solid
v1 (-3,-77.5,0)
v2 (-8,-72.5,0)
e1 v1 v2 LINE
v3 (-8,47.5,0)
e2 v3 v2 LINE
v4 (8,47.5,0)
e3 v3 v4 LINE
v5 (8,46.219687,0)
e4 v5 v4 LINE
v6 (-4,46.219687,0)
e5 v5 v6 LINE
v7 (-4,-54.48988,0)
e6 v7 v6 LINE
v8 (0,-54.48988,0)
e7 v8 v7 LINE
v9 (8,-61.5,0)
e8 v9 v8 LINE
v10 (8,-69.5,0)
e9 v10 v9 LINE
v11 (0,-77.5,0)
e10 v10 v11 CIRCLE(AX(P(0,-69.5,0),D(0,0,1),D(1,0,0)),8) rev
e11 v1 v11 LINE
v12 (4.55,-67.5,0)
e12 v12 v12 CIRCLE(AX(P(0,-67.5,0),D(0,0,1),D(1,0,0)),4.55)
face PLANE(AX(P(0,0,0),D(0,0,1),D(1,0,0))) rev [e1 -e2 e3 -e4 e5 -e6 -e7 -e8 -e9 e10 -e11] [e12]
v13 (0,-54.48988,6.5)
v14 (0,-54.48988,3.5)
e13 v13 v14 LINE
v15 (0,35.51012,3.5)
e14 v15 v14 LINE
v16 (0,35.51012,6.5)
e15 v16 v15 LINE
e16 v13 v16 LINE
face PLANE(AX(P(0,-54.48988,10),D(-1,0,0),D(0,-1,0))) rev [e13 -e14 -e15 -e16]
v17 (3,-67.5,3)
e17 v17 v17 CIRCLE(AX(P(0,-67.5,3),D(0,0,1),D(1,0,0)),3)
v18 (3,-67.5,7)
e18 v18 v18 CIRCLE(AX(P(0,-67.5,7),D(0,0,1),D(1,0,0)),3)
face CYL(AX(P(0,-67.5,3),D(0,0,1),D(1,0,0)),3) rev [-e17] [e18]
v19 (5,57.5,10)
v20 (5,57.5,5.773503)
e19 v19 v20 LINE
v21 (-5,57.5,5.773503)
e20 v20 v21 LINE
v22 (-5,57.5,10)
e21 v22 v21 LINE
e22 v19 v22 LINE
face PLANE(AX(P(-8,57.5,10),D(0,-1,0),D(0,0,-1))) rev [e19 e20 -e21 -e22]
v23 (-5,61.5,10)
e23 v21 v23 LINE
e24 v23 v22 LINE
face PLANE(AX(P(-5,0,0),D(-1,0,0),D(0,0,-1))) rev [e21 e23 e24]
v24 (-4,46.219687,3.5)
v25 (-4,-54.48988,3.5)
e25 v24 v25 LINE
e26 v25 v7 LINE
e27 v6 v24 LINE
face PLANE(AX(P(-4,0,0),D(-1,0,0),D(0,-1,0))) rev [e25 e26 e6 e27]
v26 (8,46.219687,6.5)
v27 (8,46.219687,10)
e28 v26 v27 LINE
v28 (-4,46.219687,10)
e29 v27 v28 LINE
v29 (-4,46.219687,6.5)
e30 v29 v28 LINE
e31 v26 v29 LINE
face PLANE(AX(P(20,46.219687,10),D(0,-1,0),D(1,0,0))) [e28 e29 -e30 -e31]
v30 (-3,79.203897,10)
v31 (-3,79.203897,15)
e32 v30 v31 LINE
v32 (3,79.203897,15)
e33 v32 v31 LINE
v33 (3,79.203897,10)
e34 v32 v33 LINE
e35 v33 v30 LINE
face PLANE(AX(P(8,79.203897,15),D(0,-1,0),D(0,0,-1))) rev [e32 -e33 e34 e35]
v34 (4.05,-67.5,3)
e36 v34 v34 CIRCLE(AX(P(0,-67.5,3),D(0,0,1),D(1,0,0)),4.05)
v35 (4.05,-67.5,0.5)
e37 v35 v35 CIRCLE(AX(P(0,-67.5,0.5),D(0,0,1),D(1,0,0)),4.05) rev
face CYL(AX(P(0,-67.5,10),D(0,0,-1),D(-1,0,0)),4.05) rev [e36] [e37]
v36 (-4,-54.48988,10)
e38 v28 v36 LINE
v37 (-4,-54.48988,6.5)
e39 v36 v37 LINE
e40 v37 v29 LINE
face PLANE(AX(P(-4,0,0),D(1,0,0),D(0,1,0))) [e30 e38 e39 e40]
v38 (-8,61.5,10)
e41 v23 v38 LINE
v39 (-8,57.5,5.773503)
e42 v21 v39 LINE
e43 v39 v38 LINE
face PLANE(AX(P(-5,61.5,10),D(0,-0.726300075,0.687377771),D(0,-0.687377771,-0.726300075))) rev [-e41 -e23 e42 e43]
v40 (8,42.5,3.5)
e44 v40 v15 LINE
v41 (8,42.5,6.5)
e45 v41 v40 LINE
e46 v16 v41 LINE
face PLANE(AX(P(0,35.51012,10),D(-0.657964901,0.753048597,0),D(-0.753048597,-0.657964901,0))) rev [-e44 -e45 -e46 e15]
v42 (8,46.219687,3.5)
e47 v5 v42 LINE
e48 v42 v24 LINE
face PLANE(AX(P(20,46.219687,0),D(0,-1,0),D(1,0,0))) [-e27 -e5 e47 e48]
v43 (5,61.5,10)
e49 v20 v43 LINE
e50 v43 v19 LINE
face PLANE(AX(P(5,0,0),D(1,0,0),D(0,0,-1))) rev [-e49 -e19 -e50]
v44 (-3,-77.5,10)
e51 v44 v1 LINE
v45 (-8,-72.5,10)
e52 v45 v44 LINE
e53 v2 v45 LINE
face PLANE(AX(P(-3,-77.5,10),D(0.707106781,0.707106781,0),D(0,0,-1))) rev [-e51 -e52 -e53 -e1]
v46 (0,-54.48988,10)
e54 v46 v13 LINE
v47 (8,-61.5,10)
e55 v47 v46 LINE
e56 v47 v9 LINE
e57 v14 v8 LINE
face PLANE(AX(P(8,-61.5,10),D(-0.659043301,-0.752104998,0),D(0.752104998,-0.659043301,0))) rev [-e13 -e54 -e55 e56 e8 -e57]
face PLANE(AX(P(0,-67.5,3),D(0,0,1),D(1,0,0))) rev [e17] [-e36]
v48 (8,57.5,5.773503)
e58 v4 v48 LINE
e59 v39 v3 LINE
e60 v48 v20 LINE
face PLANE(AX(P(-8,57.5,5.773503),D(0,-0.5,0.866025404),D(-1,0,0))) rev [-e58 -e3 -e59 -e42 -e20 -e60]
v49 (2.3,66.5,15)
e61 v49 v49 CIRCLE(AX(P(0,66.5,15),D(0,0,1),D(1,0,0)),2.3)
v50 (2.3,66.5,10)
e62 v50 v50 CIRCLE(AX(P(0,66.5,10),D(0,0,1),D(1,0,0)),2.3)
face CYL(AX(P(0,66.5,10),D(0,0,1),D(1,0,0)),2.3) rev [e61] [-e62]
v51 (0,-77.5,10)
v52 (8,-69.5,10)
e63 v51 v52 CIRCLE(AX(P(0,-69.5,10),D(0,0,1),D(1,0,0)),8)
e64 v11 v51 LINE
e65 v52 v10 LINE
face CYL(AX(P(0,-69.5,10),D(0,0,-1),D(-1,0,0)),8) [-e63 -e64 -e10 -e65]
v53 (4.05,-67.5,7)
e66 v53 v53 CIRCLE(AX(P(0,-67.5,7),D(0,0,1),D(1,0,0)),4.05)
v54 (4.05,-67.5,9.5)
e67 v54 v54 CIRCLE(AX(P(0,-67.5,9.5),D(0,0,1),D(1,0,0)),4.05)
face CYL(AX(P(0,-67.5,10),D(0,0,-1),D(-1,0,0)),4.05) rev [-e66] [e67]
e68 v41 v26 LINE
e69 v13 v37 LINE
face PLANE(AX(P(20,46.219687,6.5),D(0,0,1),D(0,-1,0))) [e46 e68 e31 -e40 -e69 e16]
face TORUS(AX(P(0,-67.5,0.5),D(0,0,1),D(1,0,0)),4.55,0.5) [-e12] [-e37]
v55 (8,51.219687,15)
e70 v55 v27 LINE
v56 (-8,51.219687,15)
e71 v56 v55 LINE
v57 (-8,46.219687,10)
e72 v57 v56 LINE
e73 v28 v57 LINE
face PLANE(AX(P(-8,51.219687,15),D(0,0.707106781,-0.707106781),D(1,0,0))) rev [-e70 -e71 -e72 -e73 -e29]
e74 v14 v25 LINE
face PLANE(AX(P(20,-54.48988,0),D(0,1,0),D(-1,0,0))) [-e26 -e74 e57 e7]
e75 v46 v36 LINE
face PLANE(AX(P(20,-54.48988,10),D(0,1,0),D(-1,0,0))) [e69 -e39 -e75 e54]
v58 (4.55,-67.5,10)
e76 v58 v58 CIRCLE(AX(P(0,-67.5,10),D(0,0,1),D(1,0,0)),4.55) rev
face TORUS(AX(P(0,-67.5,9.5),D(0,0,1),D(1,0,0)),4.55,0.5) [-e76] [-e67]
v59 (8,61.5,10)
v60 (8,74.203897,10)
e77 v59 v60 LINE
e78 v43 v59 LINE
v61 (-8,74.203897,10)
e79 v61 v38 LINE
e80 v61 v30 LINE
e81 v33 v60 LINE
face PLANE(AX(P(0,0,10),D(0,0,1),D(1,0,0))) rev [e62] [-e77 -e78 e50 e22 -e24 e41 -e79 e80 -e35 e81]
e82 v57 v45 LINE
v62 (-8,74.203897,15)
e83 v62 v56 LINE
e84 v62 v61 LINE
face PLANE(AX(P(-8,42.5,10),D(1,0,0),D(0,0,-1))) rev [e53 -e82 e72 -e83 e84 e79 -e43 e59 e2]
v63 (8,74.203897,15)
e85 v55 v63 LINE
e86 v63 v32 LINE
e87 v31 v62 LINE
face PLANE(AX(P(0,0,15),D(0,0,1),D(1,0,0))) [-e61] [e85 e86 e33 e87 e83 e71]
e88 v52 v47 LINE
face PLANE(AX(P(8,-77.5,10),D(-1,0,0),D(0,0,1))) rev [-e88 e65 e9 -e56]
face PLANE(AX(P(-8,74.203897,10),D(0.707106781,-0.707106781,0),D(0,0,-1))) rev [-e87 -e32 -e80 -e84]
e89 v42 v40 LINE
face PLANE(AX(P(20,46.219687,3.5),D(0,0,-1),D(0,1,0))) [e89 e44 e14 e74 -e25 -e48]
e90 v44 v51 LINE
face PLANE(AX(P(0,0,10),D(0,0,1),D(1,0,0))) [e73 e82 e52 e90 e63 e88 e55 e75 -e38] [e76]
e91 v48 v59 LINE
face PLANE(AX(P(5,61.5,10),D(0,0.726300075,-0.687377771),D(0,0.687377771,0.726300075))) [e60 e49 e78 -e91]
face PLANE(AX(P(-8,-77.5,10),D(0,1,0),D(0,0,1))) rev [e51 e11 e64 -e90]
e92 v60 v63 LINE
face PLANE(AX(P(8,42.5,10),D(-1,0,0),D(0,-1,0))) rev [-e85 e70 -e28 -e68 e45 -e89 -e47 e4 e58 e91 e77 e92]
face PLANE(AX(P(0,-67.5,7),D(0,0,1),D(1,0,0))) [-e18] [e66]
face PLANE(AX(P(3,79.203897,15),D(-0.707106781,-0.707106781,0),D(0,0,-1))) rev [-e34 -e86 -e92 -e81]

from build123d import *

# Parameters (mm, degrees)
SKETCH_1_R               = 4.05
EXTRUDE_1_DEPTH          = 10
SKETCH_2_W               = 16
SKETCH_2_H               = 27.984210489
EXTRUDE_2_DEPTH          = 5
SKETCH_3_R               = 2.3
CUT_EXTRUDE_1_DEPTH      = 5
CHAMFER_2_SIZE           = 5
CHAMFER_3_SIZE           = 10
CHAMFER_3_SIZE2          = 5.773502692
EXTRUDE_3_DEPTH          = 3
CHAMFER_5_SIZE           = 5
CHAMFER_6_SIZE           = 5
FILLET_1_R               = 8
CUT_EXTRUDE_3_DEPTH      = 20
CUT_EXTRUDE_3_DEPTH_BACK = 4
SKETCH_7_W               = 3.5
SKETCH_7_H               = 100.709566722
EXTRUDE_4_DEPTH          = 2
EXTRUDE_4_DEPTH_BACK     = 2
SKETCH_8_R               = 4.05
SKETCH_8_R_2             = 3
FILLET_2_R               = 0.5


with BuildPart() as part:
    # 草图1 → 凸台-拉伸1 (new body)
    with BuildSketch(Plane.XY):
        Polygon((-8, -77.5), (8, -77.5), (8, -61.5), (0, -54.489879842), (0, 35.510120158), (8, 42.5), (8, 57.5), (-8, 57.5), (-8, 42.5), (-8, -61.5), align=None)
        with Locations((0, -67.5)):
            Circle(SKETCH_1_R, mode=Mode.SUBTRACT)
    extrude(amount=EXTRUDE_1_DEPTH)

    # 草图2 → 凸台-拉伸2 (add)
    with BuildSketch(Plane.XY.offset(10)):
        with Locations((0, 65.211792125)):
            Rectangle(SKETCH_2_W, SKETCH_2_H)
    extrude(amount=EXTRUDE_2_DEPTH)

    # 草图3 → 切除-拉伸1 (cut)
    with BuildSketch(Plane.XY.offset(15)):
        with Locations((0, 66.5)):
            Circle(SKETCH_3_R)
    extrude(amount=-CUT_EXTRUDE_1_DEPTH, mode=Mode.SUBTRACT)

    # 倒角2
    chamfer_2_edges = [part.edges().sort_by_distance(p)[0] for p in [
        (0, 51.21968688, 10),
    ]]
    chamfer(chamfer_2_edges, length=CHAMFER_2_SIZE - 0.0001)  # a hair under: the kernel refuses the full size

    # 倒角3
    chamfer_3_edges = [part.edges().sort_by_distance(p)[0] for p in [
        (0, 57.5, 0),
    ]]
    chamfer_3_side = [part.faces().sort_by_distance(p)[0] for p in [
        (-2.385544593, -8.070394636, 0),
    ]]
    chamfer(chamfer_3_edges, length=CHAMFER_3_SIZE, length2=CHAMFER_3_SIZE2, reference=chamfer_3_side[0])

    # 草图5 → 凸台-拉伸3 (add)
    with BuildSketch(Plane(origin=(8, 0, 0), x_dir=(0, 0, -1), z_dir=(1, 0, 0))):
        Polygon((-10, 61.5), (-5.773502692, 57.5), (-10, 57.5), align=None)
    extrude_3 = extrude(amount=-EXTRUDE_3_DEPTH)

    # 镜向1: 凸台-拉伸3 across plane
    add(extrude_3.mirror(Plane(origin=(0, 0, 0), x_dir=(0, 0, 1), z_dir=(1, 0, 0))))

    # 倒角5
    chamfer_5_edges = [part.edges().sort_by_distance(p)[0] for p in [
        (-8, 79.203897369, 12.5),
        (8, 79.203897369, 12.5),
    ]]
    chamfer(chamfer_5_edges, length=CHAMFER_5_SIZE)

    # 倒角6
    chamfer_6_edges = [part.edges().sort_by_distance(p)[0] for p in [
        (-8, -77.5, 5),
    ]]
    chamfer(chamfer_6_edges, length=CHAMFER_6_SIZE)

    # 圆角1
    fillet_1_edges = [part.edges().sort_by_distance(p)[0] for p in [
        (8, -77.5, 5),
    ]]
    fillet(fillet_1_edges, radius=FILLET_1_R)

    # 草图7 → 切除-拉伸3 (cut, two sides: drawn at the far end of the back side and taken through both)
    with BuildSketch(Plane(origin=(0, 0, 0), x_dir=(0, 0, -1), z_dir=(1, 0, 0)).offset(-CUT_EXTRUDE_3_DEPTH_BACK)):
        with Locations((-1.75, -4.135096481)):
            Rectangle(SKETCH_7_W, SKETCH_7_H)
        with Locations((-8.25, -4.135096481)):
            Rectangle(SKETCH_7_W, SKETCH_7_H)
    extrude(amount=CUT_EXTRUDE_3_DEPTH + CUT_EXTRUDE_3_DEPTH_BACK, mode=Mode.SUBTRACT)

    # 草图8 → 凸台-拉伸4 (add, two sides: drawn at the far end of the back side and taken through both)
    with BuildSketch(Plane.XY.offset(5).offset(-EXTRUDE_4_DEPTH_BACK)):
        with Locations((0, -67.5)):
            Circle(SKETCH_8_R)
        with Locations((0, -67.5)):
            Circle(SKETCH_8_R_2, mode=Mode.SUBTRACT)
    extrude(amount=EXTRUDE_4_DEPTH + EXTRUDE_4_DEPTH_BACK)

    # 圆角2
    fillet_2_edges = [part.edges().sort_by_distance(p)[0] for p in [
        (-4.05, -67.5, 0),
        (-4.05, -67.5, 10),
    ]]
    fillet(fillet_2_edges, radius=FILLET_2_R)


solid = part.part
